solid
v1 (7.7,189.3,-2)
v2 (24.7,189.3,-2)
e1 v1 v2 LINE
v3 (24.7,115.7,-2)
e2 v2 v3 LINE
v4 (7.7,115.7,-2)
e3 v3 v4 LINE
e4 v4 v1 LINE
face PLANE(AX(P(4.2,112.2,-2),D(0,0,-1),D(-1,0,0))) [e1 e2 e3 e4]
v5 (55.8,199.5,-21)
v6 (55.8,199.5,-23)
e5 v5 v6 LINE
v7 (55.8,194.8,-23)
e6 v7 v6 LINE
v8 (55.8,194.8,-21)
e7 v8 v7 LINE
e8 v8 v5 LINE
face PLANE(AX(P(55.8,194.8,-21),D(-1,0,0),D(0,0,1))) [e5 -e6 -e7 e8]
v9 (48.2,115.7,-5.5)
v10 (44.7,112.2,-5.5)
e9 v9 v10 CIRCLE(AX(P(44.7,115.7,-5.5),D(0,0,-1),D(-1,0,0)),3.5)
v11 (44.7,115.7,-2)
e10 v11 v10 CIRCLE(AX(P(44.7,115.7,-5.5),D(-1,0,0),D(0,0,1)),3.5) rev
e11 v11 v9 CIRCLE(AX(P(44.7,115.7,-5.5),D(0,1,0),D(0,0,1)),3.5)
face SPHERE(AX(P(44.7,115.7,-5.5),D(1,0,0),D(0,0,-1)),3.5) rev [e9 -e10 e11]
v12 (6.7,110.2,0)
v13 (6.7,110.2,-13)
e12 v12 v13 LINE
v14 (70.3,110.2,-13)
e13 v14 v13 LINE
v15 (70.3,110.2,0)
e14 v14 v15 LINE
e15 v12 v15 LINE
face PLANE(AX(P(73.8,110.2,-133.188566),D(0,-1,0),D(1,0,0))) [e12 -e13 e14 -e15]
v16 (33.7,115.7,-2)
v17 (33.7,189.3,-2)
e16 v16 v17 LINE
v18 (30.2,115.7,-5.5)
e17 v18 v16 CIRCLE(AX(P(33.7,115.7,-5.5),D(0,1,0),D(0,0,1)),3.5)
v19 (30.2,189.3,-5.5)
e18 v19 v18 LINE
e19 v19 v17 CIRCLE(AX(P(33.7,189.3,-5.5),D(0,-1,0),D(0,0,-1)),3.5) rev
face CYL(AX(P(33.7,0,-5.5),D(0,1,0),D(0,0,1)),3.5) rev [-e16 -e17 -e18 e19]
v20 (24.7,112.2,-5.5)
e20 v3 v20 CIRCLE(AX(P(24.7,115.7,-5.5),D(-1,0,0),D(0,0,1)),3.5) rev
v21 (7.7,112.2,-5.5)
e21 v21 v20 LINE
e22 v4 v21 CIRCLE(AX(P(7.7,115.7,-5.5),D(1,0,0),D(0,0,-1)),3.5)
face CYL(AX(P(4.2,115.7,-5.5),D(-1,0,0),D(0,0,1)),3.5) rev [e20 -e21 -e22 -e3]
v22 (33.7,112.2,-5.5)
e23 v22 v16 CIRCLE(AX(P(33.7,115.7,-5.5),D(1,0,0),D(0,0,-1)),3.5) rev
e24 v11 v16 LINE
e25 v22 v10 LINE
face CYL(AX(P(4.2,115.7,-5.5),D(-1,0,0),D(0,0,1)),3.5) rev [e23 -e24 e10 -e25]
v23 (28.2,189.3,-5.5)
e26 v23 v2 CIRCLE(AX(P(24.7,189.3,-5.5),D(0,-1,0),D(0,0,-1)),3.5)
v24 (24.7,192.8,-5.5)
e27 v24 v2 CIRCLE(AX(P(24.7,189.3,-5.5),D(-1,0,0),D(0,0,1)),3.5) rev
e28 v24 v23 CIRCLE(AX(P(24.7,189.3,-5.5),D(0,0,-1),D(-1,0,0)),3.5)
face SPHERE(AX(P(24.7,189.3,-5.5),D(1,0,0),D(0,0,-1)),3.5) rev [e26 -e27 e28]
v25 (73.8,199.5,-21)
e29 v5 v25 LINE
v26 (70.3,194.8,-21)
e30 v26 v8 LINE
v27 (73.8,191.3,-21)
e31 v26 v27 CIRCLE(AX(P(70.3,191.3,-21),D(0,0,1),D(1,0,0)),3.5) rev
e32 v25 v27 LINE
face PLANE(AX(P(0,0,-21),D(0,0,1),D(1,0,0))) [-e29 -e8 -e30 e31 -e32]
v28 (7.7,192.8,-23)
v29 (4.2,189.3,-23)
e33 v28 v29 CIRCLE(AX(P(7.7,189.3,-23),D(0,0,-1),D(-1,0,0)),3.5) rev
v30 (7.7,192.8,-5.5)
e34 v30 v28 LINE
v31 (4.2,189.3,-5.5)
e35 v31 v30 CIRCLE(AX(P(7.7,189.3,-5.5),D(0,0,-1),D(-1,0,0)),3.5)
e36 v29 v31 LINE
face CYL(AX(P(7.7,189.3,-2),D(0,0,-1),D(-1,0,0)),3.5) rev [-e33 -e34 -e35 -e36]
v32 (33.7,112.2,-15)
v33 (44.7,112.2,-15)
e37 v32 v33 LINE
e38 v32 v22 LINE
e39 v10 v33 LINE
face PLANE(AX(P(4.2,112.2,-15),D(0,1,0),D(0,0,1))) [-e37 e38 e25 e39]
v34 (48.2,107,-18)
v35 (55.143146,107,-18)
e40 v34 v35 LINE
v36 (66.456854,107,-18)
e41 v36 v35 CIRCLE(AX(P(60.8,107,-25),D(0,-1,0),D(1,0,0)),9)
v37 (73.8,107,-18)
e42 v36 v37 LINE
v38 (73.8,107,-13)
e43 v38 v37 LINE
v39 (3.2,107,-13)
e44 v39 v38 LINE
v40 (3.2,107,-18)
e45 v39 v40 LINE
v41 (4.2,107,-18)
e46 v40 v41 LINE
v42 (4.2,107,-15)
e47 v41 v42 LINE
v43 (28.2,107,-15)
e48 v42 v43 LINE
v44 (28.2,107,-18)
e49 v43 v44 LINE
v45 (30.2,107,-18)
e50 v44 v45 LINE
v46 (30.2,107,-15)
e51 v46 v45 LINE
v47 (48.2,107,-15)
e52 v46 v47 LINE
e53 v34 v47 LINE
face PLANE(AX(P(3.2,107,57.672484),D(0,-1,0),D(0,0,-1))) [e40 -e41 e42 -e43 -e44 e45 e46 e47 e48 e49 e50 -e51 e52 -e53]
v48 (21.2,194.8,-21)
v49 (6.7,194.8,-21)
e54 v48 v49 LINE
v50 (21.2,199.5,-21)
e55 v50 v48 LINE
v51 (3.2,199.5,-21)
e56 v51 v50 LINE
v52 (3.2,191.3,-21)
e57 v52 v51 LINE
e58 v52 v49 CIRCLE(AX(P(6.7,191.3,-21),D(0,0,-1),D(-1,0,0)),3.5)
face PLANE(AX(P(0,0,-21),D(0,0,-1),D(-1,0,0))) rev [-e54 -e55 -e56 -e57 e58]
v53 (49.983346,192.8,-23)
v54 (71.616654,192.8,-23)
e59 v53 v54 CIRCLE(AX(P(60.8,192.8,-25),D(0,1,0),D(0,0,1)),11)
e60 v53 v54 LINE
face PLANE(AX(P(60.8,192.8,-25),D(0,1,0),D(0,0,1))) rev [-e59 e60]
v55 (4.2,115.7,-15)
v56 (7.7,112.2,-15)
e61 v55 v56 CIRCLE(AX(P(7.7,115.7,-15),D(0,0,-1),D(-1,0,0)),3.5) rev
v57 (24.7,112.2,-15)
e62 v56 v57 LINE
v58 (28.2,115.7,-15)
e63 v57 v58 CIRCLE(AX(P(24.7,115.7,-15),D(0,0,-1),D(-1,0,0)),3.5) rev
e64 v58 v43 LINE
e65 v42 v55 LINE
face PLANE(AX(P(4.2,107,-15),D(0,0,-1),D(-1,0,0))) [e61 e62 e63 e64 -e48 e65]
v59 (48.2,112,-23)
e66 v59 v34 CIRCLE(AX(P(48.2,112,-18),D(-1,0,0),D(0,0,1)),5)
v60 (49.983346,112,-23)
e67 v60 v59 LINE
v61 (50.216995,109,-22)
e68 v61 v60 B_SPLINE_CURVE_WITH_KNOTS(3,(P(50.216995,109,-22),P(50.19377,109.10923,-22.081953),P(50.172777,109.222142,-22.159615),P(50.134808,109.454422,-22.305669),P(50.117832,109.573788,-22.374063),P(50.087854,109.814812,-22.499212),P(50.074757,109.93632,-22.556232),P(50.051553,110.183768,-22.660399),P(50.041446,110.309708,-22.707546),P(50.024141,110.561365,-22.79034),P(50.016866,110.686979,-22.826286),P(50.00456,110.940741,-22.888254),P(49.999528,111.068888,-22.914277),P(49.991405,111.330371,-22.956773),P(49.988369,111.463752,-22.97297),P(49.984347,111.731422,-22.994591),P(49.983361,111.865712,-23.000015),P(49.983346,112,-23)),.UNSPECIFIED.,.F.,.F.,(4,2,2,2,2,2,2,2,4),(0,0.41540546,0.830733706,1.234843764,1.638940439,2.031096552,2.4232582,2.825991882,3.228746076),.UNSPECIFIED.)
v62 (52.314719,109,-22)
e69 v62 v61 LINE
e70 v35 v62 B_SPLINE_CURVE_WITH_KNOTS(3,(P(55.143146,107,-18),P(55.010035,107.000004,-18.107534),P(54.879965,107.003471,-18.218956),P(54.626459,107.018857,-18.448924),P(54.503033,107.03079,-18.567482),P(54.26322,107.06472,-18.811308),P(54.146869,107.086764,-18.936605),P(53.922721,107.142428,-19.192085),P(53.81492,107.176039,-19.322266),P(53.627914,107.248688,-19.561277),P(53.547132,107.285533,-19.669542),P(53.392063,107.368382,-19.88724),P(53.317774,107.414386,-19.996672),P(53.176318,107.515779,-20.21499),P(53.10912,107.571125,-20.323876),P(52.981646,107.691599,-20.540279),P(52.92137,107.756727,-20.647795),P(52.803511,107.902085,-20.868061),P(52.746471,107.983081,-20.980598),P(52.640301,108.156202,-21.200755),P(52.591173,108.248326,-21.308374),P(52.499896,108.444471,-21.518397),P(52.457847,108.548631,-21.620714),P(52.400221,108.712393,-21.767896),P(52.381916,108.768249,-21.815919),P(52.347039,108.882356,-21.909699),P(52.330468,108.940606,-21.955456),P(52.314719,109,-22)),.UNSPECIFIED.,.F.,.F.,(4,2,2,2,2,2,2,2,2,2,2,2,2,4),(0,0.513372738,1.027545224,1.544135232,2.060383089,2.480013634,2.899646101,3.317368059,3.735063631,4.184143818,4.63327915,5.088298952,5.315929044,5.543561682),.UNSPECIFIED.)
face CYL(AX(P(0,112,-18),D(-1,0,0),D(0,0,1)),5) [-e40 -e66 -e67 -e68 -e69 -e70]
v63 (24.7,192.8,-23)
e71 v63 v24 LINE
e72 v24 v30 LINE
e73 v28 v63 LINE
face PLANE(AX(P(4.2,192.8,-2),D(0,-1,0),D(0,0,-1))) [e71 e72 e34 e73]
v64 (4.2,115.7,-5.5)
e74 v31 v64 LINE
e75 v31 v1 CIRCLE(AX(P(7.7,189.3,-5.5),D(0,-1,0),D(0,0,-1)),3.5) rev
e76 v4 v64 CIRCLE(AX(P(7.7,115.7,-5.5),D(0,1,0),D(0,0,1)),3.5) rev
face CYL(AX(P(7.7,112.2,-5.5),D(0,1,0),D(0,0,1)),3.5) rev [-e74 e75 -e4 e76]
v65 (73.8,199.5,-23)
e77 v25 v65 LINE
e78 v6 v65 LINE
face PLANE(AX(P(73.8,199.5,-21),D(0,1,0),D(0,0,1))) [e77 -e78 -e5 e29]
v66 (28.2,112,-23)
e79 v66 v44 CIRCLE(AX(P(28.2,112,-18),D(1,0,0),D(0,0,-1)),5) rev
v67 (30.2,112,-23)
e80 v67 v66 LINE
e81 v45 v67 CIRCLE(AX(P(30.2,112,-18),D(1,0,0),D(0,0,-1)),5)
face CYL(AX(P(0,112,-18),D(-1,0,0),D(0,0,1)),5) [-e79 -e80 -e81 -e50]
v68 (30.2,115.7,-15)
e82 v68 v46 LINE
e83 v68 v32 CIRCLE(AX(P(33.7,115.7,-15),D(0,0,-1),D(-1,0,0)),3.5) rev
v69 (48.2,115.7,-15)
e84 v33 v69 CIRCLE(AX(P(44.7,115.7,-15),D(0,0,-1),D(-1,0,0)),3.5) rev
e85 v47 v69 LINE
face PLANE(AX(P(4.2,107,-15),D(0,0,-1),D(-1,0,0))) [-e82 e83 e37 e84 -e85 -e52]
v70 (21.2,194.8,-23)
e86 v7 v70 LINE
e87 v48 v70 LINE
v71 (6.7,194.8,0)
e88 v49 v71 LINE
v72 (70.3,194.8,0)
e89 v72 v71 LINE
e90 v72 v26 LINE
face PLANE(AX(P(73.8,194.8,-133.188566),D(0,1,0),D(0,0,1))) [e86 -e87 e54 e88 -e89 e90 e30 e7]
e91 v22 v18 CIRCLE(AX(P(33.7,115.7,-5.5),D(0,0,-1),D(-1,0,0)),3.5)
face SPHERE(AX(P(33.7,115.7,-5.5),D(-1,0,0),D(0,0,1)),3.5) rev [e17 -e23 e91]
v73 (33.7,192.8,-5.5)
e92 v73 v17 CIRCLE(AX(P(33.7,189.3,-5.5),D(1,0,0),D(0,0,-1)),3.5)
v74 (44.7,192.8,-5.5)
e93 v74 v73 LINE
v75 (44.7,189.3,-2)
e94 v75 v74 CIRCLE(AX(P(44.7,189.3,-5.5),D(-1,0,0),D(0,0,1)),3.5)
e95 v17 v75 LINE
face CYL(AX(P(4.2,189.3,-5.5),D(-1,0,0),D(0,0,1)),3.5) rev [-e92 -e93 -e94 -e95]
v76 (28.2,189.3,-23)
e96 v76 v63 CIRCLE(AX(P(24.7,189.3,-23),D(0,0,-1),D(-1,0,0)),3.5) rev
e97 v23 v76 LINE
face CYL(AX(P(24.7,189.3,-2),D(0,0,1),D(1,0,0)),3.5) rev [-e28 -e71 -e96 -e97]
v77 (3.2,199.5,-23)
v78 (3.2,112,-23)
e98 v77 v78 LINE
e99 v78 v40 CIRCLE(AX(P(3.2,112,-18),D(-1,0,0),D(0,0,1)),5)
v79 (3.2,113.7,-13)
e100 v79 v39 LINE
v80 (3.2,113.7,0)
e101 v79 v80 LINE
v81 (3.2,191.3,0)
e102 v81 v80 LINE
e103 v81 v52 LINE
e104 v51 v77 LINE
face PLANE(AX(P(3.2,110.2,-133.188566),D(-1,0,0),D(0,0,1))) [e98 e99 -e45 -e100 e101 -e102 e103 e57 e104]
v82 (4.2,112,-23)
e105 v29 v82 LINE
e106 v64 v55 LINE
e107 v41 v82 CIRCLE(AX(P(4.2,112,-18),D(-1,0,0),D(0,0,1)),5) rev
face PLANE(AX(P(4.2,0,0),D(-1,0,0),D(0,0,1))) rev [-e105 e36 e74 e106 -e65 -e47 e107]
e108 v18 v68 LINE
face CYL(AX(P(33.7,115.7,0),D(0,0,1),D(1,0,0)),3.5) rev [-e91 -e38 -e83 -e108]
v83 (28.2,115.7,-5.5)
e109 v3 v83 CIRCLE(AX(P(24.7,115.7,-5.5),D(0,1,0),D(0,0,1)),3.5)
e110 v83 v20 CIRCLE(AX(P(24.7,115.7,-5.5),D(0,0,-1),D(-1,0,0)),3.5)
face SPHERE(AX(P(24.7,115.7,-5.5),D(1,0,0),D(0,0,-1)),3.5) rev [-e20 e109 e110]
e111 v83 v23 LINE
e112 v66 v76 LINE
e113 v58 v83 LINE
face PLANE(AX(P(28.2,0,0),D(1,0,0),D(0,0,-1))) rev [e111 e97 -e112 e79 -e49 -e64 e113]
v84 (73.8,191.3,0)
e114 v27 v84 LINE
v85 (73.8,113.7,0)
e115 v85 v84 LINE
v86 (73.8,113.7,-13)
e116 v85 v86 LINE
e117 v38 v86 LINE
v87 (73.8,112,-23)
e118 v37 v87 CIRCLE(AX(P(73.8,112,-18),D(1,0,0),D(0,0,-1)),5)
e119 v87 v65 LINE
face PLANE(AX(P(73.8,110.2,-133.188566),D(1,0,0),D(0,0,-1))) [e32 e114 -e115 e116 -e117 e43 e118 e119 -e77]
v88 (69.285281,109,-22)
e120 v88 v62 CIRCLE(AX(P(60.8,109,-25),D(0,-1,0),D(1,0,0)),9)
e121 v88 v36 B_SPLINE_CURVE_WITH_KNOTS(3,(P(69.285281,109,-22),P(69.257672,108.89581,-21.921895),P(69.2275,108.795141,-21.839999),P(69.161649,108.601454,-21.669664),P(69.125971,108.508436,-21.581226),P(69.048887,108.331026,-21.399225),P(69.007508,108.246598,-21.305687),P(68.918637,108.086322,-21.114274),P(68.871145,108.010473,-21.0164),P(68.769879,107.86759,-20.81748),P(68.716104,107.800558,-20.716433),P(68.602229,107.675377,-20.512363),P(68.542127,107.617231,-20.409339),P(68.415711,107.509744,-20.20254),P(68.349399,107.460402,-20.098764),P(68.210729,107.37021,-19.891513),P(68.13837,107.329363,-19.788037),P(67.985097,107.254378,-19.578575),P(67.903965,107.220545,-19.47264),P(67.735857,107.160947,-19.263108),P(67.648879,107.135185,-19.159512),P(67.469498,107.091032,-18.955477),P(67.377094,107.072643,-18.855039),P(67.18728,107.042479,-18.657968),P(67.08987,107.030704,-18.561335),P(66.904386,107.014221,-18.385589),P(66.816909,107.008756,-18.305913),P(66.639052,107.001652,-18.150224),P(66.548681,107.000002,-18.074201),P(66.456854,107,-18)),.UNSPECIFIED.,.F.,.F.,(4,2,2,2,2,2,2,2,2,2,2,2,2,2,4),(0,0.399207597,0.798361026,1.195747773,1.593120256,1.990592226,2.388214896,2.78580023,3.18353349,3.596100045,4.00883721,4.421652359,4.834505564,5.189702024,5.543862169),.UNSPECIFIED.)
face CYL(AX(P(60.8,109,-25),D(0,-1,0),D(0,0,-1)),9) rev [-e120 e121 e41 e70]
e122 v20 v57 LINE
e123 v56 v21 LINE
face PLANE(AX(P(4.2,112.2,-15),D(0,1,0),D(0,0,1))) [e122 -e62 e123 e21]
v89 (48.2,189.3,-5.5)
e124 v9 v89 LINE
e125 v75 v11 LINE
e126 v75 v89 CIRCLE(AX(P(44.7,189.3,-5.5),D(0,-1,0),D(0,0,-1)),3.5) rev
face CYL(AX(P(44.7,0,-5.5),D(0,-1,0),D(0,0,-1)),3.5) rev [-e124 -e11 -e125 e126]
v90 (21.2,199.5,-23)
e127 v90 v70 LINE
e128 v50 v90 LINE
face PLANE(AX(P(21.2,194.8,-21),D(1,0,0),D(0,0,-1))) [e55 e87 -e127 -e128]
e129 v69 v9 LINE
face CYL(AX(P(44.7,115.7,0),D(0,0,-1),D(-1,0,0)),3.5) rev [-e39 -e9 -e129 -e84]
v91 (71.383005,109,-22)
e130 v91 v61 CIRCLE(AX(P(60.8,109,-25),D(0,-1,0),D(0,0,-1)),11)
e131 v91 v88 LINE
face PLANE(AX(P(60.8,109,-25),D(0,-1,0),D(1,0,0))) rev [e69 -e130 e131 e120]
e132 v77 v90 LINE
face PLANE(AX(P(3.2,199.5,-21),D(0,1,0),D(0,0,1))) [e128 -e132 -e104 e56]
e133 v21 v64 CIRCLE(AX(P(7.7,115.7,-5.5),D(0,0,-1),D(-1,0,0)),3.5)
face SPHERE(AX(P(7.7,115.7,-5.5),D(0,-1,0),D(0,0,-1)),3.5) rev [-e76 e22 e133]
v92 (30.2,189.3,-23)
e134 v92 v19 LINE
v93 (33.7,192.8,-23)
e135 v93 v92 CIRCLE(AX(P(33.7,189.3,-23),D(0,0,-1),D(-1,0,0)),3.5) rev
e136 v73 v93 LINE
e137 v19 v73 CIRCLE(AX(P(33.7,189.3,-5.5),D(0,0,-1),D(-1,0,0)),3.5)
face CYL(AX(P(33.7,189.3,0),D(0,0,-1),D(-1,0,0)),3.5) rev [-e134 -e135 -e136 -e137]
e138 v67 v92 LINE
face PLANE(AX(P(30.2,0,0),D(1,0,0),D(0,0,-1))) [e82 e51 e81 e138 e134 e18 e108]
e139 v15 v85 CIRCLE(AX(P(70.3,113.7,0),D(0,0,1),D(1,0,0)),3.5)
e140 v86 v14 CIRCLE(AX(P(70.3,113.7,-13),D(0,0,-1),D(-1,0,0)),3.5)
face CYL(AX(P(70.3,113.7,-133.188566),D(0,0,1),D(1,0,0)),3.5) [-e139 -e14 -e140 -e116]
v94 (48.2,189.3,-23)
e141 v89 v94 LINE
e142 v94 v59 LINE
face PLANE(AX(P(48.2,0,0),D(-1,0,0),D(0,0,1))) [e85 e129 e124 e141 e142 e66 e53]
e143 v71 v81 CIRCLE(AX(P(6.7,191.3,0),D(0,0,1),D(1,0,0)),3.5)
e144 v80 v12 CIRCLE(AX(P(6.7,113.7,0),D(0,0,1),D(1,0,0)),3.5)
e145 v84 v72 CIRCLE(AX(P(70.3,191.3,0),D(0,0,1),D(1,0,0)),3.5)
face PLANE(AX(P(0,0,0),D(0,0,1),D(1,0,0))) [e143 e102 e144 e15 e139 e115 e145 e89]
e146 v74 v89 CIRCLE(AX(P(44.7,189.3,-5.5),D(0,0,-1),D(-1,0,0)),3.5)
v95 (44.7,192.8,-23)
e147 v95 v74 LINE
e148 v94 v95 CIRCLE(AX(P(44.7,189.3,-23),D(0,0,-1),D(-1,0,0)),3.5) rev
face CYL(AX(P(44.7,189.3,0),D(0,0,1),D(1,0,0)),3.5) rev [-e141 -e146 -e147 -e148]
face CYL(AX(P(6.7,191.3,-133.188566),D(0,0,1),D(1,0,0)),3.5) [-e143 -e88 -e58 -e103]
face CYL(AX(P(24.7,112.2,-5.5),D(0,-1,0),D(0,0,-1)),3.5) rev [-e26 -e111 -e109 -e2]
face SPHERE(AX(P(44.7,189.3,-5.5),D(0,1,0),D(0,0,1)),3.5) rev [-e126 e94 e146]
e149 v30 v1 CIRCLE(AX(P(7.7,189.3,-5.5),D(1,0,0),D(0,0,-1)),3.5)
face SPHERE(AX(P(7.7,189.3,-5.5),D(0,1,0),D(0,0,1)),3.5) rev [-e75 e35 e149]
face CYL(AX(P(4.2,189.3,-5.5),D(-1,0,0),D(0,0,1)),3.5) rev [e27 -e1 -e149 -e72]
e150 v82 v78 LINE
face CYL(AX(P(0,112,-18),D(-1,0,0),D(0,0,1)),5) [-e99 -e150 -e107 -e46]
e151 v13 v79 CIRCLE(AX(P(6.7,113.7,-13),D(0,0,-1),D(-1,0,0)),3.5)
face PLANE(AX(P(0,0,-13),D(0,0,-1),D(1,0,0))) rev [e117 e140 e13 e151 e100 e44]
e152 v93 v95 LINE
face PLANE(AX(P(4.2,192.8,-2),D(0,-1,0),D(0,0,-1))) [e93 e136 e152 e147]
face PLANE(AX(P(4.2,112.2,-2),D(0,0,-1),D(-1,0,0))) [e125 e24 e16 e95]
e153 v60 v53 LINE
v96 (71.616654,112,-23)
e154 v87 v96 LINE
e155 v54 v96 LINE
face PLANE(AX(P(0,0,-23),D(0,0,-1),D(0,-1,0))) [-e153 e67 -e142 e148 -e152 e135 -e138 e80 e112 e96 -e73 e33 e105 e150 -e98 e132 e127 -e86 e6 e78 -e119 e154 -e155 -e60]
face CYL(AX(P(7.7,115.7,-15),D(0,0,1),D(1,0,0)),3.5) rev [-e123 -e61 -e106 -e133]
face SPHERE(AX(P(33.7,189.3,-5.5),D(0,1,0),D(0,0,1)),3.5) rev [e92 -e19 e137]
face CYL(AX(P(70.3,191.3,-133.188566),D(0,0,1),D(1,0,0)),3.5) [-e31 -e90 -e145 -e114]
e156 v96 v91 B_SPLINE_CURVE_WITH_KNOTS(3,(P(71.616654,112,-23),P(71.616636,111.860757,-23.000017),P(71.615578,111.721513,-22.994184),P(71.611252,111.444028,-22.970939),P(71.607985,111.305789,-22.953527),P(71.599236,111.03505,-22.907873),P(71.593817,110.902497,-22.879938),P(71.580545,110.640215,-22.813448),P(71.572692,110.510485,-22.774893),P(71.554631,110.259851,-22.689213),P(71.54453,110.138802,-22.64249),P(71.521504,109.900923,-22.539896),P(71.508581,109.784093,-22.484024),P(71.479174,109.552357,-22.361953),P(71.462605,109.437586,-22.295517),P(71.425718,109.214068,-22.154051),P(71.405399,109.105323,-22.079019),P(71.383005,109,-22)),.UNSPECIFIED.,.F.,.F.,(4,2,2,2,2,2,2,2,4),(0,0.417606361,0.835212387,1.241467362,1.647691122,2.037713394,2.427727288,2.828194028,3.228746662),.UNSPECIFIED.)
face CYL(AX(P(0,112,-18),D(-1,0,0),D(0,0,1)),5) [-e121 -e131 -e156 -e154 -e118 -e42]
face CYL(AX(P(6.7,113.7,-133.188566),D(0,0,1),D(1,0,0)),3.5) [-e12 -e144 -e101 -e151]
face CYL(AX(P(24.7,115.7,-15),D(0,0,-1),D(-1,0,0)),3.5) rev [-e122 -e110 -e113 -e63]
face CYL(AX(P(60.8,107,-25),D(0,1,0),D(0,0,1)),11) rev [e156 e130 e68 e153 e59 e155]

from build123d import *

# Parameters (mm, degrees)
SKETCH_1_W               = 70.6
SKETCH_1_H               = 84.6
EXTRUDE_1_DEPTH          = 23
SKETCH_2_W               = 18
SKETCH_2_H               = 4.7
EXTRUDE_2_DEPTH          = 2
SKETCH_3_W               = 70.6
SKETCH_3_H               = 3.2
EXTRUDE_3_DEPTH          = 10
CUT_EXTRUDE_START        = -2
SKETCH_4_R               = 11
CUT_EXTRUDE_1_DEPTH      = 115.979827321
EXTRUDE_START            = -2
EXTRUDE_1_2_DEPTH        = 2
DELETE_START             = 107
DELETE_FACE_1_DEPTH      = 2
CUT_EXTRUDE_2_DEPTH      = 1
CUT_EXTRUDE_2_DEPTH_BACK = 43
CUT_EXTRUDE_2_START      = -2
EXTRUDE_START_2          = 24
EXTRUDE_4_DEPTH          = 2
FILLET_1_R               = 5
FILLET_2_R               = 3.5
FILLET_3_R               = 3.5


# Read off the part's stored shape, not the designer's step: 删除面1
with BuildPart() as part:
    # 草图1 → Extrude 1 (new body)
    with BuildSketch(Plane.XY):
        with Locations((38.5, 152.5)):
            Rectangle(SKETCH_1_W, SKETCH_1_H)
    extrude(amount=-EXTRUDE_1_DEPTH)

    # 草图2 → 凸台-拉伸2 (add)
    with BuildSketch(Plane(origin=(0, 0, -23), x_dir=(-1, 0, 0), z_dir=(0, 0, -1))):
        with Locations((-12.2, 197.15)):
            Rectangle(SKETCH_2_W, SKETCH_2_H)
        with Locations((-64.8, 197.15)):
            Rectangle(SKETCH_2_W, SKETCH_2_H)
    extrude(amount=-EXTRUDE_2_DEPTH)

    # 草图3 → 凸台-拉伸3 (add)
    with BuildSketch(Plane(origin=(0, 0, -23), x_dir=(-1, 0, 0), z_dir=(0, 0, -1))):
        with Locations((-38.5, 108.6)):
            Rectangle(SKETCH_3_W, SKETCH_3_H)
    extrude(amount=-EXTRUDE_3_DEPTH)

    # 草图4 → 切除-拉伸1 (cut, through all)
    with BuildSketch(Plane(origin=(0, 194.8, 0), x_dir=(1, 0, 0), z_dir=(0, 1, 0)).offset(CUT_EXTRUDE_START)):
        with Locations((60.8, 25)):
            Circle(SKETCH_4_R)
    extrude(amount=-CUT_EXTRUDE_1_DEPTH, mode=Mode.SUBTRACT)

    # 草图5 → Extrude 1 2 (add)
    with BuildSketch(Plane.XZ.offset(-107).offset(EXTRUDE_START)):
        with BuildLine():
            ThreePointArc((71.616653826, -23), (60.8, -14), (49.983346174, -23))
            Line((49.983346174, -23), (51.950010506, -23.363636364))
            ThreePointArc((51.950010506, -23.363636364), (60.8, -16), (69.649989494, -23.363636364))
            Line((69.649989494, -23.363636364), (71.616653826, -23))
        make_face()
    extrude(amount=EXTRUDE_1_2_DEPTH)

    # Delete Face 1 outline → Delete Face 1 (cut)
    with BuildSketch(Plane(origin=(0, 0, 0), x_dir=(1, 0, 0), z_dir=(0, 1, 0)).offset(DELETE_START)):
        with BuildLine():
            Line((49.983346174, 23), (52.025035613, 23))
            ThreePointArc((52.025035613, 23), (51.985647631, 23.181431245), (51.950010506, 23.363636364))
            Line((51.950010506, 23.363636364), (49.983346174, 23))
        make_face()
        with BuildLine():
            Line((71.616653826, 23), (69.649989494, 23.363636364))
            ThreePointArc((69.649989494, 23.363636364), (69.614352369, 23.181431245), (69.574964387, 23))
            Line((69.574964387, 23), (71.616653826, 23))
        make_face()
    extrude(amount=DELETE_FACE_1_DEPTH, mode=Mode.SUBTRACT)

    # 草图6 → 切除-拉伸2 (cut, two sides: drawn at the far end of the back side and taken through both)
    with BuildSketch(Plane.ZY.offset(-3.2).offset(CUT_EXTRUDE_2_START - CUT_EXTRUDE_2_DEPTH_BACK)):
        Polygon((-23, 107), (-15, 107), (-15, 112.2), (-2, 112.2), (-2, 192.8), (-23, 192.8), align=None)
    extrude(amount=CUT_EXTRUDE_2_DEPTH + CUT_EXTRUDE_2_DEPTH_BACK, mode=Mode.SUBTRACT)

    # 草图7 → 凸台-拉伸4 (add)
    with BuildSketch(Plane(origin=(4.2, 0, 0), x_dir=(0, 0, -1), z_dir=(1, 0, 0)).offset(EXTRUDE_START_2)):
        Polygon((23, 107), (23, 192.8), (2, 192.8), (2, 112.2), (15, 112.2), (15, 107), align=None)
    extrude(amount=EXTRUDE_4_DEPTH)

    # 圆角1
    fillet_1_edges = [part.edges().sort_by_distance(p)[0] for p in [
        (71.687482194, 107, -23),
        (50.112517807, 107, -23),
        (29.2, 107, -23),
        (3.7, 107, -23),
    ]]
    fillet(fillet_1_edges, radius=FILLET_1_R)

    # 圆角2
    fillet_2_edges = [part.edges().sort_by_distance(p)[0] for p in [
        (73.8, 194.8, -10.5),
        (3.2, 194.8, -10.5),
        (3.2, 110.2, -6.5),
        (73.8, 110.2, -6.5),
    ]]
    fillet(fillet_2_edges, radius=FILLET_2_R)

    # 圆角3
    fillet_3_edges = [part.edges().sort_by_distance(p)[0] for p in [
        (39.2, 192.8, -2),
        (39.2, 112.2, -2),
        (28.2, 192.8, -12.5),
        (28.2, 152.5, -2),
        (28.2, 112.2, -8.5),
        (30.2, 192.8, -12.5),
        (30.2, 152.5, -2),
        (30.2, 112.2, -8.5),
        (48.2, 112.2, -8.5),
        (16.2, 112.2, -2),
        (48.2, 152.5, -2),
        (16.2, 192.8, -2),
        (48.2, 192.8, -12.5),
        (4.2, 112.2, -8.5),
        (4.2, 152.5, -2),
        (4.2, 192.8, -12.5),
    ]]
    fillet(fillet_3_edges, radius=FILLET_3_R)


solid = part.part
